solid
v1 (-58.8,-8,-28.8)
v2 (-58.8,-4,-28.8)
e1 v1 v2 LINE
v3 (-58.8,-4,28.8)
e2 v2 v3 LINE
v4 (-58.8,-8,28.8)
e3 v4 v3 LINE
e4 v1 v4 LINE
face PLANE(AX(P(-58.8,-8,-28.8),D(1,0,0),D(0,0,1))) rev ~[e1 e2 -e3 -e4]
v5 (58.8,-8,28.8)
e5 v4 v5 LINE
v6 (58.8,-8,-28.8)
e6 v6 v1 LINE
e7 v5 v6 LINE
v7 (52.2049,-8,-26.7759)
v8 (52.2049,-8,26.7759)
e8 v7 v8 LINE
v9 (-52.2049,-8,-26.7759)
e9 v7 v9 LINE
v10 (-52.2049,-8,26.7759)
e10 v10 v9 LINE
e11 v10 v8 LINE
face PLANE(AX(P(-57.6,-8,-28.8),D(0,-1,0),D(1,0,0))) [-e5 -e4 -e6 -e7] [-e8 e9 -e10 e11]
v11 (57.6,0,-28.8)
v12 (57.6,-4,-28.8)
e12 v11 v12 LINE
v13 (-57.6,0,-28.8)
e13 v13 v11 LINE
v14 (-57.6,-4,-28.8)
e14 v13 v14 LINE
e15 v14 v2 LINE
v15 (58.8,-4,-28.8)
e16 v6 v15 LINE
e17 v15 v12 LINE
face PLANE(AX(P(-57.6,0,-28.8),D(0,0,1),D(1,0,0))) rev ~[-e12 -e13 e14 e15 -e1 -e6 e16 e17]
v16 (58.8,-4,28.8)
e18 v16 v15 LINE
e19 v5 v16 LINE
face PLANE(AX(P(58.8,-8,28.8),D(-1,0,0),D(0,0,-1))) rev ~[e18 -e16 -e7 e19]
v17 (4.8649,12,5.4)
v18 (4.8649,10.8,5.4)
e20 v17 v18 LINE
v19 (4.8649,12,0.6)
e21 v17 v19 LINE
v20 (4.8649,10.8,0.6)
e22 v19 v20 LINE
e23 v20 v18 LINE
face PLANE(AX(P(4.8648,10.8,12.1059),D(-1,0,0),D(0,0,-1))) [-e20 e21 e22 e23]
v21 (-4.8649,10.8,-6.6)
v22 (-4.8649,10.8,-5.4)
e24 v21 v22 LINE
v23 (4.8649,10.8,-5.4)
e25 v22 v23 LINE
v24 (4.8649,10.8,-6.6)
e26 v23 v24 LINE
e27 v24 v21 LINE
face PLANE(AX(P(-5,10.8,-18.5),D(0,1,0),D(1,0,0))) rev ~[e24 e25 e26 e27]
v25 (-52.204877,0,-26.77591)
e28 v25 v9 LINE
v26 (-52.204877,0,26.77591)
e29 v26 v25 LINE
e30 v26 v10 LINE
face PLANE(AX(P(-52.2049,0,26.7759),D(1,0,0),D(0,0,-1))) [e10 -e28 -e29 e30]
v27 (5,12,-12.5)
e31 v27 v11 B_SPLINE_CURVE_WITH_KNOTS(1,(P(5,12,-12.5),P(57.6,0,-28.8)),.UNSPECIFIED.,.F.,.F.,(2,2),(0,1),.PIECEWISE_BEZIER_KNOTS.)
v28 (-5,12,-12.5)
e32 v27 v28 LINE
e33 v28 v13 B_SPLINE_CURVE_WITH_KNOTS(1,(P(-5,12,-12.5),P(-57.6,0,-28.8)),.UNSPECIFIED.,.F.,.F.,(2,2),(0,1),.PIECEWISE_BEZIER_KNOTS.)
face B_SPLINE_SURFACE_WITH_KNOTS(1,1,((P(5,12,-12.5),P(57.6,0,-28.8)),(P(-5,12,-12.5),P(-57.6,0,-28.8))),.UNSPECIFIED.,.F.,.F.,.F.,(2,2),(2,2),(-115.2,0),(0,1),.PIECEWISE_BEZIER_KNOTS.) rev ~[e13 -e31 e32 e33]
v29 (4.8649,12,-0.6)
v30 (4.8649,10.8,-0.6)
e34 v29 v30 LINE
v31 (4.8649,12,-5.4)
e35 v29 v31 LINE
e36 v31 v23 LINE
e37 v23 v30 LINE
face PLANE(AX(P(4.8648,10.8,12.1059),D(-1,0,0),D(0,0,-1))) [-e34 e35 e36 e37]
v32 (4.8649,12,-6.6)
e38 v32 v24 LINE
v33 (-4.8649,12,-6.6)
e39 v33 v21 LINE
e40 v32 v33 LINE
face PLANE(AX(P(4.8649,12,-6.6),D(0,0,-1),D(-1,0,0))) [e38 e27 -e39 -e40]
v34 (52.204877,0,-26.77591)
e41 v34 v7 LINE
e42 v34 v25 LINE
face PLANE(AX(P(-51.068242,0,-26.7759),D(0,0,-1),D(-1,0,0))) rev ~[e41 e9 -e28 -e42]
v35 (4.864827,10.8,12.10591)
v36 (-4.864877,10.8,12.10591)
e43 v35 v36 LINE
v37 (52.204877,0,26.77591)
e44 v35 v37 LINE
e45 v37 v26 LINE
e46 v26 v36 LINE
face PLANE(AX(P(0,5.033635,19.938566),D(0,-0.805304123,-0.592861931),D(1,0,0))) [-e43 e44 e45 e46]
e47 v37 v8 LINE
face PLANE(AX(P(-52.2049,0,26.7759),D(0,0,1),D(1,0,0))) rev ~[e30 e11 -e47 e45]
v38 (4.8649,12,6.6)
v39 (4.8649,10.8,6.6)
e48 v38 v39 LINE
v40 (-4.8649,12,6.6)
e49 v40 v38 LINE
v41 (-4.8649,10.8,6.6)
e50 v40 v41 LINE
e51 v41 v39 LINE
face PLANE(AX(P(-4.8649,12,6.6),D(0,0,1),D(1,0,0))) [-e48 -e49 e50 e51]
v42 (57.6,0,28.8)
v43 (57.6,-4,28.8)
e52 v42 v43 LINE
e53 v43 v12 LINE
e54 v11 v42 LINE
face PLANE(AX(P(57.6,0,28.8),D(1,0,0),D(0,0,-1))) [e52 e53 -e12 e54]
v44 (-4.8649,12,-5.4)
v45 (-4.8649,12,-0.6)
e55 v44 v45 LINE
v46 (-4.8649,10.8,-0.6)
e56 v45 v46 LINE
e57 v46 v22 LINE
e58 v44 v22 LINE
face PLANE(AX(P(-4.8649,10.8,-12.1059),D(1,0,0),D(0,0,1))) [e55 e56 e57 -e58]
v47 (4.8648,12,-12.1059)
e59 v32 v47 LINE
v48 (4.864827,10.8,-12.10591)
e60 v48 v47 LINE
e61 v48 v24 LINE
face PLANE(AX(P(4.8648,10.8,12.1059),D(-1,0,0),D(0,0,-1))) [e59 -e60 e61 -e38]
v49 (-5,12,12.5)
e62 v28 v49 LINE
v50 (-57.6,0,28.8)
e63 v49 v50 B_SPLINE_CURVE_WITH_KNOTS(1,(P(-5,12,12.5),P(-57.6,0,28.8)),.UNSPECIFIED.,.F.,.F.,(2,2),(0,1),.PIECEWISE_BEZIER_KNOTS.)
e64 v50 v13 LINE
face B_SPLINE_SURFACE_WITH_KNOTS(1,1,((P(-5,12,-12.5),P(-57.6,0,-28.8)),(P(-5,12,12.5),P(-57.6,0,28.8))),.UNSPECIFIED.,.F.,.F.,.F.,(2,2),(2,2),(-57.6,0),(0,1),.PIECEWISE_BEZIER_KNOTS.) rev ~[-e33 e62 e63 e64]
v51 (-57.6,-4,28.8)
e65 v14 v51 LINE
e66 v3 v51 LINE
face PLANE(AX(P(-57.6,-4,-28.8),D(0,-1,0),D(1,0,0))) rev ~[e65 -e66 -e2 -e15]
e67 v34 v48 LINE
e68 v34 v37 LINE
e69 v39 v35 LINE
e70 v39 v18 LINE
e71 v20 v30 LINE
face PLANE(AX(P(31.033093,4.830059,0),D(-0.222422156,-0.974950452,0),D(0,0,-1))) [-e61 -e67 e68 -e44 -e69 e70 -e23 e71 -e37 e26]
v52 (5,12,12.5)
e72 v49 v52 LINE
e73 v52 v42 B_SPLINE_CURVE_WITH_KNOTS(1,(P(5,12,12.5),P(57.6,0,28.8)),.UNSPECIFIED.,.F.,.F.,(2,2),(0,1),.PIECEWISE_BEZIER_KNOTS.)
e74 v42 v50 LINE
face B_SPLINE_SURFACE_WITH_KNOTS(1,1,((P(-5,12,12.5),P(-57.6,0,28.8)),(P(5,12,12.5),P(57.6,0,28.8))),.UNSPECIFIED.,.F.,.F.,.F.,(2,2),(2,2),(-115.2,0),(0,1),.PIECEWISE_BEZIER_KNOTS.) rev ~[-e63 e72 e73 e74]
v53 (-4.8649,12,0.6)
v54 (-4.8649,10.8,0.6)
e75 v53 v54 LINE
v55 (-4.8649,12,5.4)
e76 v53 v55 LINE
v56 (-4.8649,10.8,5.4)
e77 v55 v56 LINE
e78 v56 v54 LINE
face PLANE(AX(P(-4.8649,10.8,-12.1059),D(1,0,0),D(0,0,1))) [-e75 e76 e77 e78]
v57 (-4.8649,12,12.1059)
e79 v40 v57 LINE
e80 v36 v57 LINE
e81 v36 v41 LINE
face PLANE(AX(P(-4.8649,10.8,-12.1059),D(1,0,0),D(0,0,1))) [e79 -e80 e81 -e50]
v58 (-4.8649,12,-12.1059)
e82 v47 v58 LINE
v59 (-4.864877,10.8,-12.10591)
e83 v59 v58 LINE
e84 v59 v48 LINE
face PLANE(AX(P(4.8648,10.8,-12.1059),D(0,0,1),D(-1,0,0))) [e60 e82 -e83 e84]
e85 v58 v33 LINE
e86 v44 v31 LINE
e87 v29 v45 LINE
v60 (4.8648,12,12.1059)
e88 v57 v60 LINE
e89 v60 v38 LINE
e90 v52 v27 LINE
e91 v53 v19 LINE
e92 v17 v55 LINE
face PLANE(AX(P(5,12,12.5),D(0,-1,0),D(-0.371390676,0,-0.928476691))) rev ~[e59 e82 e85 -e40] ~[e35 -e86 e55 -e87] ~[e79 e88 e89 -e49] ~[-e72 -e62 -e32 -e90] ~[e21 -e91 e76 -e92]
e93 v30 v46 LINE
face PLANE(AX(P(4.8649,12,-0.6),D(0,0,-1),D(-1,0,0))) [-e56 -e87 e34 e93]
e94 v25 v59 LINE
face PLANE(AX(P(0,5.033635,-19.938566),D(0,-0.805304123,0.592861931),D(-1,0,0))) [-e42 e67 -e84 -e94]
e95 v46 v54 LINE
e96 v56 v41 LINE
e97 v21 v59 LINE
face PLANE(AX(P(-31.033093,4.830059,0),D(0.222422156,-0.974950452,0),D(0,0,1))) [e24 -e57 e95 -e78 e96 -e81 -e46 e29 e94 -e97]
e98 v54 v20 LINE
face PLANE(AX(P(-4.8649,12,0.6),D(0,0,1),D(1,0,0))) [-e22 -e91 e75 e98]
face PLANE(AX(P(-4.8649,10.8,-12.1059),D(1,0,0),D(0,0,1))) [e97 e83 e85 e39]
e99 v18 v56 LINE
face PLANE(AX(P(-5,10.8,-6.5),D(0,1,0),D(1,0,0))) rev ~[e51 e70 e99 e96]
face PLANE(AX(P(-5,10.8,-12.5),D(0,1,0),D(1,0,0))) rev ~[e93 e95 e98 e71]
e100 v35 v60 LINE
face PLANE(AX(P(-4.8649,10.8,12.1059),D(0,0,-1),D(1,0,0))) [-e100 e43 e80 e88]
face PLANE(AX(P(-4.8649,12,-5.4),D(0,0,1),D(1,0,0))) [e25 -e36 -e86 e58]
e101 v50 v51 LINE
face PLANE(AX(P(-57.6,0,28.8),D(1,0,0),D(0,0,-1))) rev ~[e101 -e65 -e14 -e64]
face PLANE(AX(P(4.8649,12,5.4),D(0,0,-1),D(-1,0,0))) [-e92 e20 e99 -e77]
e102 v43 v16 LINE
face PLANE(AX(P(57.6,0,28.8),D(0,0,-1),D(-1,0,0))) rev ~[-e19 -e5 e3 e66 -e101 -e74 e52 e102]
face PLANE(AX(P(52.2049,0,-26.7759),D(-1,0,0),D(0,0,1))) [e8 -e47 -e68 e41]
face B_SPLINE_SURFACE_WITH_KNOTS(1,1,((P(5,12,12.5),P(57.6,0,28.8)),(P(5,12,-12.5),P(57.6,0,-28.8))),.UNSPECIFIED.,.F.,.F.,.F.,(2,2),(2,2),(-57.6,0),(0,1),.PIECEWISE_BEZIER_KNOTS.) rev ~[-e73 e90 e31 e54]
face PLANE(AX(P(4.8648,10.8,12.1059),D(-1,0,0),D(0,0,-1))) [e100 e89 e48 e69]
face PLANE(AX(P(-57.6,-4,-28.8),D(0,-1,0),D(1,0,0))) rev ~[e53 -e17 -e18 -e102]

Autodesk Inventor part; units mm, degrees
ref_plane "YZ Plane" through (0, 0, 0) normal (1, 0, 0) x (0, 1, 0)
ref_plane "XY Plane" through (0, 0, 0) normal (0, 0, 1) x (1, 0, 0)
sketch "Szkic1" plane through (0, 0, 0) normal (0, 1, 0) x (-1, 0, 0)
  line L0 (57.6, -28.8) -> (-57.6, -28.8)
  line L1 (-57.6, -28.8) -> (-57.6, 28.8)
  line L2 (-57.6, 28.8) -> (57.6, 28.8)
  line L3 (57.6, 28.8) -> (57.6, -28.8)
  line L4 (57.6, -28.8) -> (-57.6, 28.8) construction
  line L5 (-57.6, -28.8) -> (57.6, 28.8) construction
  point P0 (0, 0)
  dimension "d0" = 115.2
  dimension "d1" = 57.6
ref_plane "Płaszczyzna konstrukcyjna3" through (0, 12, 0) normal (0, 1, 0) x (-1, 0, 0)
sketch "Szkic11" plane through (0, 12, 0) normal (0, 1, 0) x (-1, 0, 0)
  line L0 (-5, -12.5) -> (5, -12.5)
  line L1 (5, -12.5) -> (5, 12.5)
  line L2 (5, 12.5) -> (-5, 12.5)
  line L3 (-5, 12.5) -> (-5, -12.5)
  line L4 (-5, -12.5) -> (5, 12.5) construction
  line L5 (5, -12.5) -> (-5, 12.5) construction
  point P0 (0, 0)
  dimension "d41" = 10
  dimension "d42" = 25
loft "Wyciągnięcie złożone3" add profiles "Szkic11", "Szkic1"
shell "Skorupa3" thickness 1.2 removed faces 1 at (-19.2, 0, 9.6)
sketch "Szkic12" plane through (-4.8649, 10.8, -12.1059) normal (0, -1, 0) x (1, 0, 0)
  line L0 (0, 0) -> (0, 24.2118) projected
  line L1 (9.7297, 0) -> (57.0697, -14.67) projected
  line L2 (0, 24.2118) -> (9.7297, 24.2118)
  line L3 (9.7297, 24.2118) -> (9.7297, 0)
  line L4 (9.7297, 0) -> (0, 0)
  line L5 (0, 0) -> (0, 24.2118)
  point P0 (4.8649, 12.1059)
extrude "Wyciągnięcie proste7" cut sketch "Szkic12" against normal blind 10
sketch "Szkic13" plane through (-57.6, 0, -28.8) normal (0, -1, 0) x (1, 0, 0)
  line L0 (115.2, 57.6) -> (115.2, 0) projected
  line L1 (52.6, 16.3) -> (0, 0) projected
  line L2 (115.2, 57.6) -> (0, 57.6)
  line L3 (0, 57.6) -> (0, 0)
  line L4 (0, 0) -> (115.2, 0)
  line L5 (115.2, 0) -> (115.2, 57.6)
  line L6 (5.3951, 55.5759) -> (109.8049, 55.5759) projected
  line L7 (109.8049, 2.0241) -> (5.3951, 2.0241) projected
  line L8 (109.8049, 55.5759) -> (5.3951, 55.5759)
  line L9 (5.3951, 55.5759) -> (5.3951, 2.0241)
  line L10 (5.3951, 2.0241) -> (109.8049, 2.0241)
  line L11 (109.8049, 2.0241) -> (109.8049, 55.5759)
  point P0 (57.6, 28.8)
extrude "Wyciągnięcie proste8" add sketch "Szkic13" along normal blind 8
sketch "Szkic14" plane through (-57.6, -8, -28.8) normal (0, -1, 0) x (1, 0, 0)
  line L0 (115.2, 57.6) -> (0, 57.6) projected
  line L1 (115.2, 0) -> (0, 0)
  line L2 (0, 0) -> (0, 57.6)
  line L3 (0, 57.6) -> (115.2, 57.6)
  line L4 (115.2, 57.6) -> (115.2, 0)
  line L5 (115.2, 0) -> (0, 57.6) construction
  line L6 (0, 0) -> (115.2, 57.6) construction
  line L7 (116.4, 0) -> (-1.2, 0)
  line L8 (-1.2, 0) -> (-1.2, 57.6)
  line L9 (-1.2, 57.6) -> (116.4, 57.6)
  line L10 (116.4, 57.6) -> (116.4, 0)
  line L11 (116.4, 0) -> (-1.2, 57.6) construction
  line L12 (-1.2, 0) -> (116.4, 57.6) construction
  point P0 (57.6, 28.8)
  dimension "d52" = 117.6
extrude "Wyciągnięcie proste9" add sketch "Szkic14" against normal blind 4 contours L9 L10 L7 L4 | L2 L7 L8 L9
sketch "Szkic15" plane through (-5, 12, -12.5) normal (0, 1, 0) x (1, 0, 0)
  line L0 (9.8649, -24.6059) -> (9.8649, -0.3941) projected
  line L1 (0.1351, -13.1) -> (9.8649, -13.1)
  line L2 (9.8649, -13.1) -> (9.8649, -11.9)
  line L3 (9.8649, -11.9) -> (0.1351, -11.9)
  line L4 (0.1351, -11.9) -> (0.1351, -13.1)
  line L5 (0.1351, -13.1) -> (9.8649, -11.9) construction
  line L6 (9.8649, -13.1) -> (0.1351, -11.9) construction
  point P0 (5, -12.5)
  dimension "d55" = 1.2
extrude "Wyciągnięcie proste10" add sketch "Szkic15" against normal blind 1.2
pattern_linear "Szyk prostokątny3" count 2 spacing 6 along (0, 0, -1) of "Wyciągnięcie proste10"
pattern_linear "Szyk prostokątny4" count 2 spacing 6 along (0, 0, 1) of "Wyciągnięcie proste10"
properties part number "lejek"
